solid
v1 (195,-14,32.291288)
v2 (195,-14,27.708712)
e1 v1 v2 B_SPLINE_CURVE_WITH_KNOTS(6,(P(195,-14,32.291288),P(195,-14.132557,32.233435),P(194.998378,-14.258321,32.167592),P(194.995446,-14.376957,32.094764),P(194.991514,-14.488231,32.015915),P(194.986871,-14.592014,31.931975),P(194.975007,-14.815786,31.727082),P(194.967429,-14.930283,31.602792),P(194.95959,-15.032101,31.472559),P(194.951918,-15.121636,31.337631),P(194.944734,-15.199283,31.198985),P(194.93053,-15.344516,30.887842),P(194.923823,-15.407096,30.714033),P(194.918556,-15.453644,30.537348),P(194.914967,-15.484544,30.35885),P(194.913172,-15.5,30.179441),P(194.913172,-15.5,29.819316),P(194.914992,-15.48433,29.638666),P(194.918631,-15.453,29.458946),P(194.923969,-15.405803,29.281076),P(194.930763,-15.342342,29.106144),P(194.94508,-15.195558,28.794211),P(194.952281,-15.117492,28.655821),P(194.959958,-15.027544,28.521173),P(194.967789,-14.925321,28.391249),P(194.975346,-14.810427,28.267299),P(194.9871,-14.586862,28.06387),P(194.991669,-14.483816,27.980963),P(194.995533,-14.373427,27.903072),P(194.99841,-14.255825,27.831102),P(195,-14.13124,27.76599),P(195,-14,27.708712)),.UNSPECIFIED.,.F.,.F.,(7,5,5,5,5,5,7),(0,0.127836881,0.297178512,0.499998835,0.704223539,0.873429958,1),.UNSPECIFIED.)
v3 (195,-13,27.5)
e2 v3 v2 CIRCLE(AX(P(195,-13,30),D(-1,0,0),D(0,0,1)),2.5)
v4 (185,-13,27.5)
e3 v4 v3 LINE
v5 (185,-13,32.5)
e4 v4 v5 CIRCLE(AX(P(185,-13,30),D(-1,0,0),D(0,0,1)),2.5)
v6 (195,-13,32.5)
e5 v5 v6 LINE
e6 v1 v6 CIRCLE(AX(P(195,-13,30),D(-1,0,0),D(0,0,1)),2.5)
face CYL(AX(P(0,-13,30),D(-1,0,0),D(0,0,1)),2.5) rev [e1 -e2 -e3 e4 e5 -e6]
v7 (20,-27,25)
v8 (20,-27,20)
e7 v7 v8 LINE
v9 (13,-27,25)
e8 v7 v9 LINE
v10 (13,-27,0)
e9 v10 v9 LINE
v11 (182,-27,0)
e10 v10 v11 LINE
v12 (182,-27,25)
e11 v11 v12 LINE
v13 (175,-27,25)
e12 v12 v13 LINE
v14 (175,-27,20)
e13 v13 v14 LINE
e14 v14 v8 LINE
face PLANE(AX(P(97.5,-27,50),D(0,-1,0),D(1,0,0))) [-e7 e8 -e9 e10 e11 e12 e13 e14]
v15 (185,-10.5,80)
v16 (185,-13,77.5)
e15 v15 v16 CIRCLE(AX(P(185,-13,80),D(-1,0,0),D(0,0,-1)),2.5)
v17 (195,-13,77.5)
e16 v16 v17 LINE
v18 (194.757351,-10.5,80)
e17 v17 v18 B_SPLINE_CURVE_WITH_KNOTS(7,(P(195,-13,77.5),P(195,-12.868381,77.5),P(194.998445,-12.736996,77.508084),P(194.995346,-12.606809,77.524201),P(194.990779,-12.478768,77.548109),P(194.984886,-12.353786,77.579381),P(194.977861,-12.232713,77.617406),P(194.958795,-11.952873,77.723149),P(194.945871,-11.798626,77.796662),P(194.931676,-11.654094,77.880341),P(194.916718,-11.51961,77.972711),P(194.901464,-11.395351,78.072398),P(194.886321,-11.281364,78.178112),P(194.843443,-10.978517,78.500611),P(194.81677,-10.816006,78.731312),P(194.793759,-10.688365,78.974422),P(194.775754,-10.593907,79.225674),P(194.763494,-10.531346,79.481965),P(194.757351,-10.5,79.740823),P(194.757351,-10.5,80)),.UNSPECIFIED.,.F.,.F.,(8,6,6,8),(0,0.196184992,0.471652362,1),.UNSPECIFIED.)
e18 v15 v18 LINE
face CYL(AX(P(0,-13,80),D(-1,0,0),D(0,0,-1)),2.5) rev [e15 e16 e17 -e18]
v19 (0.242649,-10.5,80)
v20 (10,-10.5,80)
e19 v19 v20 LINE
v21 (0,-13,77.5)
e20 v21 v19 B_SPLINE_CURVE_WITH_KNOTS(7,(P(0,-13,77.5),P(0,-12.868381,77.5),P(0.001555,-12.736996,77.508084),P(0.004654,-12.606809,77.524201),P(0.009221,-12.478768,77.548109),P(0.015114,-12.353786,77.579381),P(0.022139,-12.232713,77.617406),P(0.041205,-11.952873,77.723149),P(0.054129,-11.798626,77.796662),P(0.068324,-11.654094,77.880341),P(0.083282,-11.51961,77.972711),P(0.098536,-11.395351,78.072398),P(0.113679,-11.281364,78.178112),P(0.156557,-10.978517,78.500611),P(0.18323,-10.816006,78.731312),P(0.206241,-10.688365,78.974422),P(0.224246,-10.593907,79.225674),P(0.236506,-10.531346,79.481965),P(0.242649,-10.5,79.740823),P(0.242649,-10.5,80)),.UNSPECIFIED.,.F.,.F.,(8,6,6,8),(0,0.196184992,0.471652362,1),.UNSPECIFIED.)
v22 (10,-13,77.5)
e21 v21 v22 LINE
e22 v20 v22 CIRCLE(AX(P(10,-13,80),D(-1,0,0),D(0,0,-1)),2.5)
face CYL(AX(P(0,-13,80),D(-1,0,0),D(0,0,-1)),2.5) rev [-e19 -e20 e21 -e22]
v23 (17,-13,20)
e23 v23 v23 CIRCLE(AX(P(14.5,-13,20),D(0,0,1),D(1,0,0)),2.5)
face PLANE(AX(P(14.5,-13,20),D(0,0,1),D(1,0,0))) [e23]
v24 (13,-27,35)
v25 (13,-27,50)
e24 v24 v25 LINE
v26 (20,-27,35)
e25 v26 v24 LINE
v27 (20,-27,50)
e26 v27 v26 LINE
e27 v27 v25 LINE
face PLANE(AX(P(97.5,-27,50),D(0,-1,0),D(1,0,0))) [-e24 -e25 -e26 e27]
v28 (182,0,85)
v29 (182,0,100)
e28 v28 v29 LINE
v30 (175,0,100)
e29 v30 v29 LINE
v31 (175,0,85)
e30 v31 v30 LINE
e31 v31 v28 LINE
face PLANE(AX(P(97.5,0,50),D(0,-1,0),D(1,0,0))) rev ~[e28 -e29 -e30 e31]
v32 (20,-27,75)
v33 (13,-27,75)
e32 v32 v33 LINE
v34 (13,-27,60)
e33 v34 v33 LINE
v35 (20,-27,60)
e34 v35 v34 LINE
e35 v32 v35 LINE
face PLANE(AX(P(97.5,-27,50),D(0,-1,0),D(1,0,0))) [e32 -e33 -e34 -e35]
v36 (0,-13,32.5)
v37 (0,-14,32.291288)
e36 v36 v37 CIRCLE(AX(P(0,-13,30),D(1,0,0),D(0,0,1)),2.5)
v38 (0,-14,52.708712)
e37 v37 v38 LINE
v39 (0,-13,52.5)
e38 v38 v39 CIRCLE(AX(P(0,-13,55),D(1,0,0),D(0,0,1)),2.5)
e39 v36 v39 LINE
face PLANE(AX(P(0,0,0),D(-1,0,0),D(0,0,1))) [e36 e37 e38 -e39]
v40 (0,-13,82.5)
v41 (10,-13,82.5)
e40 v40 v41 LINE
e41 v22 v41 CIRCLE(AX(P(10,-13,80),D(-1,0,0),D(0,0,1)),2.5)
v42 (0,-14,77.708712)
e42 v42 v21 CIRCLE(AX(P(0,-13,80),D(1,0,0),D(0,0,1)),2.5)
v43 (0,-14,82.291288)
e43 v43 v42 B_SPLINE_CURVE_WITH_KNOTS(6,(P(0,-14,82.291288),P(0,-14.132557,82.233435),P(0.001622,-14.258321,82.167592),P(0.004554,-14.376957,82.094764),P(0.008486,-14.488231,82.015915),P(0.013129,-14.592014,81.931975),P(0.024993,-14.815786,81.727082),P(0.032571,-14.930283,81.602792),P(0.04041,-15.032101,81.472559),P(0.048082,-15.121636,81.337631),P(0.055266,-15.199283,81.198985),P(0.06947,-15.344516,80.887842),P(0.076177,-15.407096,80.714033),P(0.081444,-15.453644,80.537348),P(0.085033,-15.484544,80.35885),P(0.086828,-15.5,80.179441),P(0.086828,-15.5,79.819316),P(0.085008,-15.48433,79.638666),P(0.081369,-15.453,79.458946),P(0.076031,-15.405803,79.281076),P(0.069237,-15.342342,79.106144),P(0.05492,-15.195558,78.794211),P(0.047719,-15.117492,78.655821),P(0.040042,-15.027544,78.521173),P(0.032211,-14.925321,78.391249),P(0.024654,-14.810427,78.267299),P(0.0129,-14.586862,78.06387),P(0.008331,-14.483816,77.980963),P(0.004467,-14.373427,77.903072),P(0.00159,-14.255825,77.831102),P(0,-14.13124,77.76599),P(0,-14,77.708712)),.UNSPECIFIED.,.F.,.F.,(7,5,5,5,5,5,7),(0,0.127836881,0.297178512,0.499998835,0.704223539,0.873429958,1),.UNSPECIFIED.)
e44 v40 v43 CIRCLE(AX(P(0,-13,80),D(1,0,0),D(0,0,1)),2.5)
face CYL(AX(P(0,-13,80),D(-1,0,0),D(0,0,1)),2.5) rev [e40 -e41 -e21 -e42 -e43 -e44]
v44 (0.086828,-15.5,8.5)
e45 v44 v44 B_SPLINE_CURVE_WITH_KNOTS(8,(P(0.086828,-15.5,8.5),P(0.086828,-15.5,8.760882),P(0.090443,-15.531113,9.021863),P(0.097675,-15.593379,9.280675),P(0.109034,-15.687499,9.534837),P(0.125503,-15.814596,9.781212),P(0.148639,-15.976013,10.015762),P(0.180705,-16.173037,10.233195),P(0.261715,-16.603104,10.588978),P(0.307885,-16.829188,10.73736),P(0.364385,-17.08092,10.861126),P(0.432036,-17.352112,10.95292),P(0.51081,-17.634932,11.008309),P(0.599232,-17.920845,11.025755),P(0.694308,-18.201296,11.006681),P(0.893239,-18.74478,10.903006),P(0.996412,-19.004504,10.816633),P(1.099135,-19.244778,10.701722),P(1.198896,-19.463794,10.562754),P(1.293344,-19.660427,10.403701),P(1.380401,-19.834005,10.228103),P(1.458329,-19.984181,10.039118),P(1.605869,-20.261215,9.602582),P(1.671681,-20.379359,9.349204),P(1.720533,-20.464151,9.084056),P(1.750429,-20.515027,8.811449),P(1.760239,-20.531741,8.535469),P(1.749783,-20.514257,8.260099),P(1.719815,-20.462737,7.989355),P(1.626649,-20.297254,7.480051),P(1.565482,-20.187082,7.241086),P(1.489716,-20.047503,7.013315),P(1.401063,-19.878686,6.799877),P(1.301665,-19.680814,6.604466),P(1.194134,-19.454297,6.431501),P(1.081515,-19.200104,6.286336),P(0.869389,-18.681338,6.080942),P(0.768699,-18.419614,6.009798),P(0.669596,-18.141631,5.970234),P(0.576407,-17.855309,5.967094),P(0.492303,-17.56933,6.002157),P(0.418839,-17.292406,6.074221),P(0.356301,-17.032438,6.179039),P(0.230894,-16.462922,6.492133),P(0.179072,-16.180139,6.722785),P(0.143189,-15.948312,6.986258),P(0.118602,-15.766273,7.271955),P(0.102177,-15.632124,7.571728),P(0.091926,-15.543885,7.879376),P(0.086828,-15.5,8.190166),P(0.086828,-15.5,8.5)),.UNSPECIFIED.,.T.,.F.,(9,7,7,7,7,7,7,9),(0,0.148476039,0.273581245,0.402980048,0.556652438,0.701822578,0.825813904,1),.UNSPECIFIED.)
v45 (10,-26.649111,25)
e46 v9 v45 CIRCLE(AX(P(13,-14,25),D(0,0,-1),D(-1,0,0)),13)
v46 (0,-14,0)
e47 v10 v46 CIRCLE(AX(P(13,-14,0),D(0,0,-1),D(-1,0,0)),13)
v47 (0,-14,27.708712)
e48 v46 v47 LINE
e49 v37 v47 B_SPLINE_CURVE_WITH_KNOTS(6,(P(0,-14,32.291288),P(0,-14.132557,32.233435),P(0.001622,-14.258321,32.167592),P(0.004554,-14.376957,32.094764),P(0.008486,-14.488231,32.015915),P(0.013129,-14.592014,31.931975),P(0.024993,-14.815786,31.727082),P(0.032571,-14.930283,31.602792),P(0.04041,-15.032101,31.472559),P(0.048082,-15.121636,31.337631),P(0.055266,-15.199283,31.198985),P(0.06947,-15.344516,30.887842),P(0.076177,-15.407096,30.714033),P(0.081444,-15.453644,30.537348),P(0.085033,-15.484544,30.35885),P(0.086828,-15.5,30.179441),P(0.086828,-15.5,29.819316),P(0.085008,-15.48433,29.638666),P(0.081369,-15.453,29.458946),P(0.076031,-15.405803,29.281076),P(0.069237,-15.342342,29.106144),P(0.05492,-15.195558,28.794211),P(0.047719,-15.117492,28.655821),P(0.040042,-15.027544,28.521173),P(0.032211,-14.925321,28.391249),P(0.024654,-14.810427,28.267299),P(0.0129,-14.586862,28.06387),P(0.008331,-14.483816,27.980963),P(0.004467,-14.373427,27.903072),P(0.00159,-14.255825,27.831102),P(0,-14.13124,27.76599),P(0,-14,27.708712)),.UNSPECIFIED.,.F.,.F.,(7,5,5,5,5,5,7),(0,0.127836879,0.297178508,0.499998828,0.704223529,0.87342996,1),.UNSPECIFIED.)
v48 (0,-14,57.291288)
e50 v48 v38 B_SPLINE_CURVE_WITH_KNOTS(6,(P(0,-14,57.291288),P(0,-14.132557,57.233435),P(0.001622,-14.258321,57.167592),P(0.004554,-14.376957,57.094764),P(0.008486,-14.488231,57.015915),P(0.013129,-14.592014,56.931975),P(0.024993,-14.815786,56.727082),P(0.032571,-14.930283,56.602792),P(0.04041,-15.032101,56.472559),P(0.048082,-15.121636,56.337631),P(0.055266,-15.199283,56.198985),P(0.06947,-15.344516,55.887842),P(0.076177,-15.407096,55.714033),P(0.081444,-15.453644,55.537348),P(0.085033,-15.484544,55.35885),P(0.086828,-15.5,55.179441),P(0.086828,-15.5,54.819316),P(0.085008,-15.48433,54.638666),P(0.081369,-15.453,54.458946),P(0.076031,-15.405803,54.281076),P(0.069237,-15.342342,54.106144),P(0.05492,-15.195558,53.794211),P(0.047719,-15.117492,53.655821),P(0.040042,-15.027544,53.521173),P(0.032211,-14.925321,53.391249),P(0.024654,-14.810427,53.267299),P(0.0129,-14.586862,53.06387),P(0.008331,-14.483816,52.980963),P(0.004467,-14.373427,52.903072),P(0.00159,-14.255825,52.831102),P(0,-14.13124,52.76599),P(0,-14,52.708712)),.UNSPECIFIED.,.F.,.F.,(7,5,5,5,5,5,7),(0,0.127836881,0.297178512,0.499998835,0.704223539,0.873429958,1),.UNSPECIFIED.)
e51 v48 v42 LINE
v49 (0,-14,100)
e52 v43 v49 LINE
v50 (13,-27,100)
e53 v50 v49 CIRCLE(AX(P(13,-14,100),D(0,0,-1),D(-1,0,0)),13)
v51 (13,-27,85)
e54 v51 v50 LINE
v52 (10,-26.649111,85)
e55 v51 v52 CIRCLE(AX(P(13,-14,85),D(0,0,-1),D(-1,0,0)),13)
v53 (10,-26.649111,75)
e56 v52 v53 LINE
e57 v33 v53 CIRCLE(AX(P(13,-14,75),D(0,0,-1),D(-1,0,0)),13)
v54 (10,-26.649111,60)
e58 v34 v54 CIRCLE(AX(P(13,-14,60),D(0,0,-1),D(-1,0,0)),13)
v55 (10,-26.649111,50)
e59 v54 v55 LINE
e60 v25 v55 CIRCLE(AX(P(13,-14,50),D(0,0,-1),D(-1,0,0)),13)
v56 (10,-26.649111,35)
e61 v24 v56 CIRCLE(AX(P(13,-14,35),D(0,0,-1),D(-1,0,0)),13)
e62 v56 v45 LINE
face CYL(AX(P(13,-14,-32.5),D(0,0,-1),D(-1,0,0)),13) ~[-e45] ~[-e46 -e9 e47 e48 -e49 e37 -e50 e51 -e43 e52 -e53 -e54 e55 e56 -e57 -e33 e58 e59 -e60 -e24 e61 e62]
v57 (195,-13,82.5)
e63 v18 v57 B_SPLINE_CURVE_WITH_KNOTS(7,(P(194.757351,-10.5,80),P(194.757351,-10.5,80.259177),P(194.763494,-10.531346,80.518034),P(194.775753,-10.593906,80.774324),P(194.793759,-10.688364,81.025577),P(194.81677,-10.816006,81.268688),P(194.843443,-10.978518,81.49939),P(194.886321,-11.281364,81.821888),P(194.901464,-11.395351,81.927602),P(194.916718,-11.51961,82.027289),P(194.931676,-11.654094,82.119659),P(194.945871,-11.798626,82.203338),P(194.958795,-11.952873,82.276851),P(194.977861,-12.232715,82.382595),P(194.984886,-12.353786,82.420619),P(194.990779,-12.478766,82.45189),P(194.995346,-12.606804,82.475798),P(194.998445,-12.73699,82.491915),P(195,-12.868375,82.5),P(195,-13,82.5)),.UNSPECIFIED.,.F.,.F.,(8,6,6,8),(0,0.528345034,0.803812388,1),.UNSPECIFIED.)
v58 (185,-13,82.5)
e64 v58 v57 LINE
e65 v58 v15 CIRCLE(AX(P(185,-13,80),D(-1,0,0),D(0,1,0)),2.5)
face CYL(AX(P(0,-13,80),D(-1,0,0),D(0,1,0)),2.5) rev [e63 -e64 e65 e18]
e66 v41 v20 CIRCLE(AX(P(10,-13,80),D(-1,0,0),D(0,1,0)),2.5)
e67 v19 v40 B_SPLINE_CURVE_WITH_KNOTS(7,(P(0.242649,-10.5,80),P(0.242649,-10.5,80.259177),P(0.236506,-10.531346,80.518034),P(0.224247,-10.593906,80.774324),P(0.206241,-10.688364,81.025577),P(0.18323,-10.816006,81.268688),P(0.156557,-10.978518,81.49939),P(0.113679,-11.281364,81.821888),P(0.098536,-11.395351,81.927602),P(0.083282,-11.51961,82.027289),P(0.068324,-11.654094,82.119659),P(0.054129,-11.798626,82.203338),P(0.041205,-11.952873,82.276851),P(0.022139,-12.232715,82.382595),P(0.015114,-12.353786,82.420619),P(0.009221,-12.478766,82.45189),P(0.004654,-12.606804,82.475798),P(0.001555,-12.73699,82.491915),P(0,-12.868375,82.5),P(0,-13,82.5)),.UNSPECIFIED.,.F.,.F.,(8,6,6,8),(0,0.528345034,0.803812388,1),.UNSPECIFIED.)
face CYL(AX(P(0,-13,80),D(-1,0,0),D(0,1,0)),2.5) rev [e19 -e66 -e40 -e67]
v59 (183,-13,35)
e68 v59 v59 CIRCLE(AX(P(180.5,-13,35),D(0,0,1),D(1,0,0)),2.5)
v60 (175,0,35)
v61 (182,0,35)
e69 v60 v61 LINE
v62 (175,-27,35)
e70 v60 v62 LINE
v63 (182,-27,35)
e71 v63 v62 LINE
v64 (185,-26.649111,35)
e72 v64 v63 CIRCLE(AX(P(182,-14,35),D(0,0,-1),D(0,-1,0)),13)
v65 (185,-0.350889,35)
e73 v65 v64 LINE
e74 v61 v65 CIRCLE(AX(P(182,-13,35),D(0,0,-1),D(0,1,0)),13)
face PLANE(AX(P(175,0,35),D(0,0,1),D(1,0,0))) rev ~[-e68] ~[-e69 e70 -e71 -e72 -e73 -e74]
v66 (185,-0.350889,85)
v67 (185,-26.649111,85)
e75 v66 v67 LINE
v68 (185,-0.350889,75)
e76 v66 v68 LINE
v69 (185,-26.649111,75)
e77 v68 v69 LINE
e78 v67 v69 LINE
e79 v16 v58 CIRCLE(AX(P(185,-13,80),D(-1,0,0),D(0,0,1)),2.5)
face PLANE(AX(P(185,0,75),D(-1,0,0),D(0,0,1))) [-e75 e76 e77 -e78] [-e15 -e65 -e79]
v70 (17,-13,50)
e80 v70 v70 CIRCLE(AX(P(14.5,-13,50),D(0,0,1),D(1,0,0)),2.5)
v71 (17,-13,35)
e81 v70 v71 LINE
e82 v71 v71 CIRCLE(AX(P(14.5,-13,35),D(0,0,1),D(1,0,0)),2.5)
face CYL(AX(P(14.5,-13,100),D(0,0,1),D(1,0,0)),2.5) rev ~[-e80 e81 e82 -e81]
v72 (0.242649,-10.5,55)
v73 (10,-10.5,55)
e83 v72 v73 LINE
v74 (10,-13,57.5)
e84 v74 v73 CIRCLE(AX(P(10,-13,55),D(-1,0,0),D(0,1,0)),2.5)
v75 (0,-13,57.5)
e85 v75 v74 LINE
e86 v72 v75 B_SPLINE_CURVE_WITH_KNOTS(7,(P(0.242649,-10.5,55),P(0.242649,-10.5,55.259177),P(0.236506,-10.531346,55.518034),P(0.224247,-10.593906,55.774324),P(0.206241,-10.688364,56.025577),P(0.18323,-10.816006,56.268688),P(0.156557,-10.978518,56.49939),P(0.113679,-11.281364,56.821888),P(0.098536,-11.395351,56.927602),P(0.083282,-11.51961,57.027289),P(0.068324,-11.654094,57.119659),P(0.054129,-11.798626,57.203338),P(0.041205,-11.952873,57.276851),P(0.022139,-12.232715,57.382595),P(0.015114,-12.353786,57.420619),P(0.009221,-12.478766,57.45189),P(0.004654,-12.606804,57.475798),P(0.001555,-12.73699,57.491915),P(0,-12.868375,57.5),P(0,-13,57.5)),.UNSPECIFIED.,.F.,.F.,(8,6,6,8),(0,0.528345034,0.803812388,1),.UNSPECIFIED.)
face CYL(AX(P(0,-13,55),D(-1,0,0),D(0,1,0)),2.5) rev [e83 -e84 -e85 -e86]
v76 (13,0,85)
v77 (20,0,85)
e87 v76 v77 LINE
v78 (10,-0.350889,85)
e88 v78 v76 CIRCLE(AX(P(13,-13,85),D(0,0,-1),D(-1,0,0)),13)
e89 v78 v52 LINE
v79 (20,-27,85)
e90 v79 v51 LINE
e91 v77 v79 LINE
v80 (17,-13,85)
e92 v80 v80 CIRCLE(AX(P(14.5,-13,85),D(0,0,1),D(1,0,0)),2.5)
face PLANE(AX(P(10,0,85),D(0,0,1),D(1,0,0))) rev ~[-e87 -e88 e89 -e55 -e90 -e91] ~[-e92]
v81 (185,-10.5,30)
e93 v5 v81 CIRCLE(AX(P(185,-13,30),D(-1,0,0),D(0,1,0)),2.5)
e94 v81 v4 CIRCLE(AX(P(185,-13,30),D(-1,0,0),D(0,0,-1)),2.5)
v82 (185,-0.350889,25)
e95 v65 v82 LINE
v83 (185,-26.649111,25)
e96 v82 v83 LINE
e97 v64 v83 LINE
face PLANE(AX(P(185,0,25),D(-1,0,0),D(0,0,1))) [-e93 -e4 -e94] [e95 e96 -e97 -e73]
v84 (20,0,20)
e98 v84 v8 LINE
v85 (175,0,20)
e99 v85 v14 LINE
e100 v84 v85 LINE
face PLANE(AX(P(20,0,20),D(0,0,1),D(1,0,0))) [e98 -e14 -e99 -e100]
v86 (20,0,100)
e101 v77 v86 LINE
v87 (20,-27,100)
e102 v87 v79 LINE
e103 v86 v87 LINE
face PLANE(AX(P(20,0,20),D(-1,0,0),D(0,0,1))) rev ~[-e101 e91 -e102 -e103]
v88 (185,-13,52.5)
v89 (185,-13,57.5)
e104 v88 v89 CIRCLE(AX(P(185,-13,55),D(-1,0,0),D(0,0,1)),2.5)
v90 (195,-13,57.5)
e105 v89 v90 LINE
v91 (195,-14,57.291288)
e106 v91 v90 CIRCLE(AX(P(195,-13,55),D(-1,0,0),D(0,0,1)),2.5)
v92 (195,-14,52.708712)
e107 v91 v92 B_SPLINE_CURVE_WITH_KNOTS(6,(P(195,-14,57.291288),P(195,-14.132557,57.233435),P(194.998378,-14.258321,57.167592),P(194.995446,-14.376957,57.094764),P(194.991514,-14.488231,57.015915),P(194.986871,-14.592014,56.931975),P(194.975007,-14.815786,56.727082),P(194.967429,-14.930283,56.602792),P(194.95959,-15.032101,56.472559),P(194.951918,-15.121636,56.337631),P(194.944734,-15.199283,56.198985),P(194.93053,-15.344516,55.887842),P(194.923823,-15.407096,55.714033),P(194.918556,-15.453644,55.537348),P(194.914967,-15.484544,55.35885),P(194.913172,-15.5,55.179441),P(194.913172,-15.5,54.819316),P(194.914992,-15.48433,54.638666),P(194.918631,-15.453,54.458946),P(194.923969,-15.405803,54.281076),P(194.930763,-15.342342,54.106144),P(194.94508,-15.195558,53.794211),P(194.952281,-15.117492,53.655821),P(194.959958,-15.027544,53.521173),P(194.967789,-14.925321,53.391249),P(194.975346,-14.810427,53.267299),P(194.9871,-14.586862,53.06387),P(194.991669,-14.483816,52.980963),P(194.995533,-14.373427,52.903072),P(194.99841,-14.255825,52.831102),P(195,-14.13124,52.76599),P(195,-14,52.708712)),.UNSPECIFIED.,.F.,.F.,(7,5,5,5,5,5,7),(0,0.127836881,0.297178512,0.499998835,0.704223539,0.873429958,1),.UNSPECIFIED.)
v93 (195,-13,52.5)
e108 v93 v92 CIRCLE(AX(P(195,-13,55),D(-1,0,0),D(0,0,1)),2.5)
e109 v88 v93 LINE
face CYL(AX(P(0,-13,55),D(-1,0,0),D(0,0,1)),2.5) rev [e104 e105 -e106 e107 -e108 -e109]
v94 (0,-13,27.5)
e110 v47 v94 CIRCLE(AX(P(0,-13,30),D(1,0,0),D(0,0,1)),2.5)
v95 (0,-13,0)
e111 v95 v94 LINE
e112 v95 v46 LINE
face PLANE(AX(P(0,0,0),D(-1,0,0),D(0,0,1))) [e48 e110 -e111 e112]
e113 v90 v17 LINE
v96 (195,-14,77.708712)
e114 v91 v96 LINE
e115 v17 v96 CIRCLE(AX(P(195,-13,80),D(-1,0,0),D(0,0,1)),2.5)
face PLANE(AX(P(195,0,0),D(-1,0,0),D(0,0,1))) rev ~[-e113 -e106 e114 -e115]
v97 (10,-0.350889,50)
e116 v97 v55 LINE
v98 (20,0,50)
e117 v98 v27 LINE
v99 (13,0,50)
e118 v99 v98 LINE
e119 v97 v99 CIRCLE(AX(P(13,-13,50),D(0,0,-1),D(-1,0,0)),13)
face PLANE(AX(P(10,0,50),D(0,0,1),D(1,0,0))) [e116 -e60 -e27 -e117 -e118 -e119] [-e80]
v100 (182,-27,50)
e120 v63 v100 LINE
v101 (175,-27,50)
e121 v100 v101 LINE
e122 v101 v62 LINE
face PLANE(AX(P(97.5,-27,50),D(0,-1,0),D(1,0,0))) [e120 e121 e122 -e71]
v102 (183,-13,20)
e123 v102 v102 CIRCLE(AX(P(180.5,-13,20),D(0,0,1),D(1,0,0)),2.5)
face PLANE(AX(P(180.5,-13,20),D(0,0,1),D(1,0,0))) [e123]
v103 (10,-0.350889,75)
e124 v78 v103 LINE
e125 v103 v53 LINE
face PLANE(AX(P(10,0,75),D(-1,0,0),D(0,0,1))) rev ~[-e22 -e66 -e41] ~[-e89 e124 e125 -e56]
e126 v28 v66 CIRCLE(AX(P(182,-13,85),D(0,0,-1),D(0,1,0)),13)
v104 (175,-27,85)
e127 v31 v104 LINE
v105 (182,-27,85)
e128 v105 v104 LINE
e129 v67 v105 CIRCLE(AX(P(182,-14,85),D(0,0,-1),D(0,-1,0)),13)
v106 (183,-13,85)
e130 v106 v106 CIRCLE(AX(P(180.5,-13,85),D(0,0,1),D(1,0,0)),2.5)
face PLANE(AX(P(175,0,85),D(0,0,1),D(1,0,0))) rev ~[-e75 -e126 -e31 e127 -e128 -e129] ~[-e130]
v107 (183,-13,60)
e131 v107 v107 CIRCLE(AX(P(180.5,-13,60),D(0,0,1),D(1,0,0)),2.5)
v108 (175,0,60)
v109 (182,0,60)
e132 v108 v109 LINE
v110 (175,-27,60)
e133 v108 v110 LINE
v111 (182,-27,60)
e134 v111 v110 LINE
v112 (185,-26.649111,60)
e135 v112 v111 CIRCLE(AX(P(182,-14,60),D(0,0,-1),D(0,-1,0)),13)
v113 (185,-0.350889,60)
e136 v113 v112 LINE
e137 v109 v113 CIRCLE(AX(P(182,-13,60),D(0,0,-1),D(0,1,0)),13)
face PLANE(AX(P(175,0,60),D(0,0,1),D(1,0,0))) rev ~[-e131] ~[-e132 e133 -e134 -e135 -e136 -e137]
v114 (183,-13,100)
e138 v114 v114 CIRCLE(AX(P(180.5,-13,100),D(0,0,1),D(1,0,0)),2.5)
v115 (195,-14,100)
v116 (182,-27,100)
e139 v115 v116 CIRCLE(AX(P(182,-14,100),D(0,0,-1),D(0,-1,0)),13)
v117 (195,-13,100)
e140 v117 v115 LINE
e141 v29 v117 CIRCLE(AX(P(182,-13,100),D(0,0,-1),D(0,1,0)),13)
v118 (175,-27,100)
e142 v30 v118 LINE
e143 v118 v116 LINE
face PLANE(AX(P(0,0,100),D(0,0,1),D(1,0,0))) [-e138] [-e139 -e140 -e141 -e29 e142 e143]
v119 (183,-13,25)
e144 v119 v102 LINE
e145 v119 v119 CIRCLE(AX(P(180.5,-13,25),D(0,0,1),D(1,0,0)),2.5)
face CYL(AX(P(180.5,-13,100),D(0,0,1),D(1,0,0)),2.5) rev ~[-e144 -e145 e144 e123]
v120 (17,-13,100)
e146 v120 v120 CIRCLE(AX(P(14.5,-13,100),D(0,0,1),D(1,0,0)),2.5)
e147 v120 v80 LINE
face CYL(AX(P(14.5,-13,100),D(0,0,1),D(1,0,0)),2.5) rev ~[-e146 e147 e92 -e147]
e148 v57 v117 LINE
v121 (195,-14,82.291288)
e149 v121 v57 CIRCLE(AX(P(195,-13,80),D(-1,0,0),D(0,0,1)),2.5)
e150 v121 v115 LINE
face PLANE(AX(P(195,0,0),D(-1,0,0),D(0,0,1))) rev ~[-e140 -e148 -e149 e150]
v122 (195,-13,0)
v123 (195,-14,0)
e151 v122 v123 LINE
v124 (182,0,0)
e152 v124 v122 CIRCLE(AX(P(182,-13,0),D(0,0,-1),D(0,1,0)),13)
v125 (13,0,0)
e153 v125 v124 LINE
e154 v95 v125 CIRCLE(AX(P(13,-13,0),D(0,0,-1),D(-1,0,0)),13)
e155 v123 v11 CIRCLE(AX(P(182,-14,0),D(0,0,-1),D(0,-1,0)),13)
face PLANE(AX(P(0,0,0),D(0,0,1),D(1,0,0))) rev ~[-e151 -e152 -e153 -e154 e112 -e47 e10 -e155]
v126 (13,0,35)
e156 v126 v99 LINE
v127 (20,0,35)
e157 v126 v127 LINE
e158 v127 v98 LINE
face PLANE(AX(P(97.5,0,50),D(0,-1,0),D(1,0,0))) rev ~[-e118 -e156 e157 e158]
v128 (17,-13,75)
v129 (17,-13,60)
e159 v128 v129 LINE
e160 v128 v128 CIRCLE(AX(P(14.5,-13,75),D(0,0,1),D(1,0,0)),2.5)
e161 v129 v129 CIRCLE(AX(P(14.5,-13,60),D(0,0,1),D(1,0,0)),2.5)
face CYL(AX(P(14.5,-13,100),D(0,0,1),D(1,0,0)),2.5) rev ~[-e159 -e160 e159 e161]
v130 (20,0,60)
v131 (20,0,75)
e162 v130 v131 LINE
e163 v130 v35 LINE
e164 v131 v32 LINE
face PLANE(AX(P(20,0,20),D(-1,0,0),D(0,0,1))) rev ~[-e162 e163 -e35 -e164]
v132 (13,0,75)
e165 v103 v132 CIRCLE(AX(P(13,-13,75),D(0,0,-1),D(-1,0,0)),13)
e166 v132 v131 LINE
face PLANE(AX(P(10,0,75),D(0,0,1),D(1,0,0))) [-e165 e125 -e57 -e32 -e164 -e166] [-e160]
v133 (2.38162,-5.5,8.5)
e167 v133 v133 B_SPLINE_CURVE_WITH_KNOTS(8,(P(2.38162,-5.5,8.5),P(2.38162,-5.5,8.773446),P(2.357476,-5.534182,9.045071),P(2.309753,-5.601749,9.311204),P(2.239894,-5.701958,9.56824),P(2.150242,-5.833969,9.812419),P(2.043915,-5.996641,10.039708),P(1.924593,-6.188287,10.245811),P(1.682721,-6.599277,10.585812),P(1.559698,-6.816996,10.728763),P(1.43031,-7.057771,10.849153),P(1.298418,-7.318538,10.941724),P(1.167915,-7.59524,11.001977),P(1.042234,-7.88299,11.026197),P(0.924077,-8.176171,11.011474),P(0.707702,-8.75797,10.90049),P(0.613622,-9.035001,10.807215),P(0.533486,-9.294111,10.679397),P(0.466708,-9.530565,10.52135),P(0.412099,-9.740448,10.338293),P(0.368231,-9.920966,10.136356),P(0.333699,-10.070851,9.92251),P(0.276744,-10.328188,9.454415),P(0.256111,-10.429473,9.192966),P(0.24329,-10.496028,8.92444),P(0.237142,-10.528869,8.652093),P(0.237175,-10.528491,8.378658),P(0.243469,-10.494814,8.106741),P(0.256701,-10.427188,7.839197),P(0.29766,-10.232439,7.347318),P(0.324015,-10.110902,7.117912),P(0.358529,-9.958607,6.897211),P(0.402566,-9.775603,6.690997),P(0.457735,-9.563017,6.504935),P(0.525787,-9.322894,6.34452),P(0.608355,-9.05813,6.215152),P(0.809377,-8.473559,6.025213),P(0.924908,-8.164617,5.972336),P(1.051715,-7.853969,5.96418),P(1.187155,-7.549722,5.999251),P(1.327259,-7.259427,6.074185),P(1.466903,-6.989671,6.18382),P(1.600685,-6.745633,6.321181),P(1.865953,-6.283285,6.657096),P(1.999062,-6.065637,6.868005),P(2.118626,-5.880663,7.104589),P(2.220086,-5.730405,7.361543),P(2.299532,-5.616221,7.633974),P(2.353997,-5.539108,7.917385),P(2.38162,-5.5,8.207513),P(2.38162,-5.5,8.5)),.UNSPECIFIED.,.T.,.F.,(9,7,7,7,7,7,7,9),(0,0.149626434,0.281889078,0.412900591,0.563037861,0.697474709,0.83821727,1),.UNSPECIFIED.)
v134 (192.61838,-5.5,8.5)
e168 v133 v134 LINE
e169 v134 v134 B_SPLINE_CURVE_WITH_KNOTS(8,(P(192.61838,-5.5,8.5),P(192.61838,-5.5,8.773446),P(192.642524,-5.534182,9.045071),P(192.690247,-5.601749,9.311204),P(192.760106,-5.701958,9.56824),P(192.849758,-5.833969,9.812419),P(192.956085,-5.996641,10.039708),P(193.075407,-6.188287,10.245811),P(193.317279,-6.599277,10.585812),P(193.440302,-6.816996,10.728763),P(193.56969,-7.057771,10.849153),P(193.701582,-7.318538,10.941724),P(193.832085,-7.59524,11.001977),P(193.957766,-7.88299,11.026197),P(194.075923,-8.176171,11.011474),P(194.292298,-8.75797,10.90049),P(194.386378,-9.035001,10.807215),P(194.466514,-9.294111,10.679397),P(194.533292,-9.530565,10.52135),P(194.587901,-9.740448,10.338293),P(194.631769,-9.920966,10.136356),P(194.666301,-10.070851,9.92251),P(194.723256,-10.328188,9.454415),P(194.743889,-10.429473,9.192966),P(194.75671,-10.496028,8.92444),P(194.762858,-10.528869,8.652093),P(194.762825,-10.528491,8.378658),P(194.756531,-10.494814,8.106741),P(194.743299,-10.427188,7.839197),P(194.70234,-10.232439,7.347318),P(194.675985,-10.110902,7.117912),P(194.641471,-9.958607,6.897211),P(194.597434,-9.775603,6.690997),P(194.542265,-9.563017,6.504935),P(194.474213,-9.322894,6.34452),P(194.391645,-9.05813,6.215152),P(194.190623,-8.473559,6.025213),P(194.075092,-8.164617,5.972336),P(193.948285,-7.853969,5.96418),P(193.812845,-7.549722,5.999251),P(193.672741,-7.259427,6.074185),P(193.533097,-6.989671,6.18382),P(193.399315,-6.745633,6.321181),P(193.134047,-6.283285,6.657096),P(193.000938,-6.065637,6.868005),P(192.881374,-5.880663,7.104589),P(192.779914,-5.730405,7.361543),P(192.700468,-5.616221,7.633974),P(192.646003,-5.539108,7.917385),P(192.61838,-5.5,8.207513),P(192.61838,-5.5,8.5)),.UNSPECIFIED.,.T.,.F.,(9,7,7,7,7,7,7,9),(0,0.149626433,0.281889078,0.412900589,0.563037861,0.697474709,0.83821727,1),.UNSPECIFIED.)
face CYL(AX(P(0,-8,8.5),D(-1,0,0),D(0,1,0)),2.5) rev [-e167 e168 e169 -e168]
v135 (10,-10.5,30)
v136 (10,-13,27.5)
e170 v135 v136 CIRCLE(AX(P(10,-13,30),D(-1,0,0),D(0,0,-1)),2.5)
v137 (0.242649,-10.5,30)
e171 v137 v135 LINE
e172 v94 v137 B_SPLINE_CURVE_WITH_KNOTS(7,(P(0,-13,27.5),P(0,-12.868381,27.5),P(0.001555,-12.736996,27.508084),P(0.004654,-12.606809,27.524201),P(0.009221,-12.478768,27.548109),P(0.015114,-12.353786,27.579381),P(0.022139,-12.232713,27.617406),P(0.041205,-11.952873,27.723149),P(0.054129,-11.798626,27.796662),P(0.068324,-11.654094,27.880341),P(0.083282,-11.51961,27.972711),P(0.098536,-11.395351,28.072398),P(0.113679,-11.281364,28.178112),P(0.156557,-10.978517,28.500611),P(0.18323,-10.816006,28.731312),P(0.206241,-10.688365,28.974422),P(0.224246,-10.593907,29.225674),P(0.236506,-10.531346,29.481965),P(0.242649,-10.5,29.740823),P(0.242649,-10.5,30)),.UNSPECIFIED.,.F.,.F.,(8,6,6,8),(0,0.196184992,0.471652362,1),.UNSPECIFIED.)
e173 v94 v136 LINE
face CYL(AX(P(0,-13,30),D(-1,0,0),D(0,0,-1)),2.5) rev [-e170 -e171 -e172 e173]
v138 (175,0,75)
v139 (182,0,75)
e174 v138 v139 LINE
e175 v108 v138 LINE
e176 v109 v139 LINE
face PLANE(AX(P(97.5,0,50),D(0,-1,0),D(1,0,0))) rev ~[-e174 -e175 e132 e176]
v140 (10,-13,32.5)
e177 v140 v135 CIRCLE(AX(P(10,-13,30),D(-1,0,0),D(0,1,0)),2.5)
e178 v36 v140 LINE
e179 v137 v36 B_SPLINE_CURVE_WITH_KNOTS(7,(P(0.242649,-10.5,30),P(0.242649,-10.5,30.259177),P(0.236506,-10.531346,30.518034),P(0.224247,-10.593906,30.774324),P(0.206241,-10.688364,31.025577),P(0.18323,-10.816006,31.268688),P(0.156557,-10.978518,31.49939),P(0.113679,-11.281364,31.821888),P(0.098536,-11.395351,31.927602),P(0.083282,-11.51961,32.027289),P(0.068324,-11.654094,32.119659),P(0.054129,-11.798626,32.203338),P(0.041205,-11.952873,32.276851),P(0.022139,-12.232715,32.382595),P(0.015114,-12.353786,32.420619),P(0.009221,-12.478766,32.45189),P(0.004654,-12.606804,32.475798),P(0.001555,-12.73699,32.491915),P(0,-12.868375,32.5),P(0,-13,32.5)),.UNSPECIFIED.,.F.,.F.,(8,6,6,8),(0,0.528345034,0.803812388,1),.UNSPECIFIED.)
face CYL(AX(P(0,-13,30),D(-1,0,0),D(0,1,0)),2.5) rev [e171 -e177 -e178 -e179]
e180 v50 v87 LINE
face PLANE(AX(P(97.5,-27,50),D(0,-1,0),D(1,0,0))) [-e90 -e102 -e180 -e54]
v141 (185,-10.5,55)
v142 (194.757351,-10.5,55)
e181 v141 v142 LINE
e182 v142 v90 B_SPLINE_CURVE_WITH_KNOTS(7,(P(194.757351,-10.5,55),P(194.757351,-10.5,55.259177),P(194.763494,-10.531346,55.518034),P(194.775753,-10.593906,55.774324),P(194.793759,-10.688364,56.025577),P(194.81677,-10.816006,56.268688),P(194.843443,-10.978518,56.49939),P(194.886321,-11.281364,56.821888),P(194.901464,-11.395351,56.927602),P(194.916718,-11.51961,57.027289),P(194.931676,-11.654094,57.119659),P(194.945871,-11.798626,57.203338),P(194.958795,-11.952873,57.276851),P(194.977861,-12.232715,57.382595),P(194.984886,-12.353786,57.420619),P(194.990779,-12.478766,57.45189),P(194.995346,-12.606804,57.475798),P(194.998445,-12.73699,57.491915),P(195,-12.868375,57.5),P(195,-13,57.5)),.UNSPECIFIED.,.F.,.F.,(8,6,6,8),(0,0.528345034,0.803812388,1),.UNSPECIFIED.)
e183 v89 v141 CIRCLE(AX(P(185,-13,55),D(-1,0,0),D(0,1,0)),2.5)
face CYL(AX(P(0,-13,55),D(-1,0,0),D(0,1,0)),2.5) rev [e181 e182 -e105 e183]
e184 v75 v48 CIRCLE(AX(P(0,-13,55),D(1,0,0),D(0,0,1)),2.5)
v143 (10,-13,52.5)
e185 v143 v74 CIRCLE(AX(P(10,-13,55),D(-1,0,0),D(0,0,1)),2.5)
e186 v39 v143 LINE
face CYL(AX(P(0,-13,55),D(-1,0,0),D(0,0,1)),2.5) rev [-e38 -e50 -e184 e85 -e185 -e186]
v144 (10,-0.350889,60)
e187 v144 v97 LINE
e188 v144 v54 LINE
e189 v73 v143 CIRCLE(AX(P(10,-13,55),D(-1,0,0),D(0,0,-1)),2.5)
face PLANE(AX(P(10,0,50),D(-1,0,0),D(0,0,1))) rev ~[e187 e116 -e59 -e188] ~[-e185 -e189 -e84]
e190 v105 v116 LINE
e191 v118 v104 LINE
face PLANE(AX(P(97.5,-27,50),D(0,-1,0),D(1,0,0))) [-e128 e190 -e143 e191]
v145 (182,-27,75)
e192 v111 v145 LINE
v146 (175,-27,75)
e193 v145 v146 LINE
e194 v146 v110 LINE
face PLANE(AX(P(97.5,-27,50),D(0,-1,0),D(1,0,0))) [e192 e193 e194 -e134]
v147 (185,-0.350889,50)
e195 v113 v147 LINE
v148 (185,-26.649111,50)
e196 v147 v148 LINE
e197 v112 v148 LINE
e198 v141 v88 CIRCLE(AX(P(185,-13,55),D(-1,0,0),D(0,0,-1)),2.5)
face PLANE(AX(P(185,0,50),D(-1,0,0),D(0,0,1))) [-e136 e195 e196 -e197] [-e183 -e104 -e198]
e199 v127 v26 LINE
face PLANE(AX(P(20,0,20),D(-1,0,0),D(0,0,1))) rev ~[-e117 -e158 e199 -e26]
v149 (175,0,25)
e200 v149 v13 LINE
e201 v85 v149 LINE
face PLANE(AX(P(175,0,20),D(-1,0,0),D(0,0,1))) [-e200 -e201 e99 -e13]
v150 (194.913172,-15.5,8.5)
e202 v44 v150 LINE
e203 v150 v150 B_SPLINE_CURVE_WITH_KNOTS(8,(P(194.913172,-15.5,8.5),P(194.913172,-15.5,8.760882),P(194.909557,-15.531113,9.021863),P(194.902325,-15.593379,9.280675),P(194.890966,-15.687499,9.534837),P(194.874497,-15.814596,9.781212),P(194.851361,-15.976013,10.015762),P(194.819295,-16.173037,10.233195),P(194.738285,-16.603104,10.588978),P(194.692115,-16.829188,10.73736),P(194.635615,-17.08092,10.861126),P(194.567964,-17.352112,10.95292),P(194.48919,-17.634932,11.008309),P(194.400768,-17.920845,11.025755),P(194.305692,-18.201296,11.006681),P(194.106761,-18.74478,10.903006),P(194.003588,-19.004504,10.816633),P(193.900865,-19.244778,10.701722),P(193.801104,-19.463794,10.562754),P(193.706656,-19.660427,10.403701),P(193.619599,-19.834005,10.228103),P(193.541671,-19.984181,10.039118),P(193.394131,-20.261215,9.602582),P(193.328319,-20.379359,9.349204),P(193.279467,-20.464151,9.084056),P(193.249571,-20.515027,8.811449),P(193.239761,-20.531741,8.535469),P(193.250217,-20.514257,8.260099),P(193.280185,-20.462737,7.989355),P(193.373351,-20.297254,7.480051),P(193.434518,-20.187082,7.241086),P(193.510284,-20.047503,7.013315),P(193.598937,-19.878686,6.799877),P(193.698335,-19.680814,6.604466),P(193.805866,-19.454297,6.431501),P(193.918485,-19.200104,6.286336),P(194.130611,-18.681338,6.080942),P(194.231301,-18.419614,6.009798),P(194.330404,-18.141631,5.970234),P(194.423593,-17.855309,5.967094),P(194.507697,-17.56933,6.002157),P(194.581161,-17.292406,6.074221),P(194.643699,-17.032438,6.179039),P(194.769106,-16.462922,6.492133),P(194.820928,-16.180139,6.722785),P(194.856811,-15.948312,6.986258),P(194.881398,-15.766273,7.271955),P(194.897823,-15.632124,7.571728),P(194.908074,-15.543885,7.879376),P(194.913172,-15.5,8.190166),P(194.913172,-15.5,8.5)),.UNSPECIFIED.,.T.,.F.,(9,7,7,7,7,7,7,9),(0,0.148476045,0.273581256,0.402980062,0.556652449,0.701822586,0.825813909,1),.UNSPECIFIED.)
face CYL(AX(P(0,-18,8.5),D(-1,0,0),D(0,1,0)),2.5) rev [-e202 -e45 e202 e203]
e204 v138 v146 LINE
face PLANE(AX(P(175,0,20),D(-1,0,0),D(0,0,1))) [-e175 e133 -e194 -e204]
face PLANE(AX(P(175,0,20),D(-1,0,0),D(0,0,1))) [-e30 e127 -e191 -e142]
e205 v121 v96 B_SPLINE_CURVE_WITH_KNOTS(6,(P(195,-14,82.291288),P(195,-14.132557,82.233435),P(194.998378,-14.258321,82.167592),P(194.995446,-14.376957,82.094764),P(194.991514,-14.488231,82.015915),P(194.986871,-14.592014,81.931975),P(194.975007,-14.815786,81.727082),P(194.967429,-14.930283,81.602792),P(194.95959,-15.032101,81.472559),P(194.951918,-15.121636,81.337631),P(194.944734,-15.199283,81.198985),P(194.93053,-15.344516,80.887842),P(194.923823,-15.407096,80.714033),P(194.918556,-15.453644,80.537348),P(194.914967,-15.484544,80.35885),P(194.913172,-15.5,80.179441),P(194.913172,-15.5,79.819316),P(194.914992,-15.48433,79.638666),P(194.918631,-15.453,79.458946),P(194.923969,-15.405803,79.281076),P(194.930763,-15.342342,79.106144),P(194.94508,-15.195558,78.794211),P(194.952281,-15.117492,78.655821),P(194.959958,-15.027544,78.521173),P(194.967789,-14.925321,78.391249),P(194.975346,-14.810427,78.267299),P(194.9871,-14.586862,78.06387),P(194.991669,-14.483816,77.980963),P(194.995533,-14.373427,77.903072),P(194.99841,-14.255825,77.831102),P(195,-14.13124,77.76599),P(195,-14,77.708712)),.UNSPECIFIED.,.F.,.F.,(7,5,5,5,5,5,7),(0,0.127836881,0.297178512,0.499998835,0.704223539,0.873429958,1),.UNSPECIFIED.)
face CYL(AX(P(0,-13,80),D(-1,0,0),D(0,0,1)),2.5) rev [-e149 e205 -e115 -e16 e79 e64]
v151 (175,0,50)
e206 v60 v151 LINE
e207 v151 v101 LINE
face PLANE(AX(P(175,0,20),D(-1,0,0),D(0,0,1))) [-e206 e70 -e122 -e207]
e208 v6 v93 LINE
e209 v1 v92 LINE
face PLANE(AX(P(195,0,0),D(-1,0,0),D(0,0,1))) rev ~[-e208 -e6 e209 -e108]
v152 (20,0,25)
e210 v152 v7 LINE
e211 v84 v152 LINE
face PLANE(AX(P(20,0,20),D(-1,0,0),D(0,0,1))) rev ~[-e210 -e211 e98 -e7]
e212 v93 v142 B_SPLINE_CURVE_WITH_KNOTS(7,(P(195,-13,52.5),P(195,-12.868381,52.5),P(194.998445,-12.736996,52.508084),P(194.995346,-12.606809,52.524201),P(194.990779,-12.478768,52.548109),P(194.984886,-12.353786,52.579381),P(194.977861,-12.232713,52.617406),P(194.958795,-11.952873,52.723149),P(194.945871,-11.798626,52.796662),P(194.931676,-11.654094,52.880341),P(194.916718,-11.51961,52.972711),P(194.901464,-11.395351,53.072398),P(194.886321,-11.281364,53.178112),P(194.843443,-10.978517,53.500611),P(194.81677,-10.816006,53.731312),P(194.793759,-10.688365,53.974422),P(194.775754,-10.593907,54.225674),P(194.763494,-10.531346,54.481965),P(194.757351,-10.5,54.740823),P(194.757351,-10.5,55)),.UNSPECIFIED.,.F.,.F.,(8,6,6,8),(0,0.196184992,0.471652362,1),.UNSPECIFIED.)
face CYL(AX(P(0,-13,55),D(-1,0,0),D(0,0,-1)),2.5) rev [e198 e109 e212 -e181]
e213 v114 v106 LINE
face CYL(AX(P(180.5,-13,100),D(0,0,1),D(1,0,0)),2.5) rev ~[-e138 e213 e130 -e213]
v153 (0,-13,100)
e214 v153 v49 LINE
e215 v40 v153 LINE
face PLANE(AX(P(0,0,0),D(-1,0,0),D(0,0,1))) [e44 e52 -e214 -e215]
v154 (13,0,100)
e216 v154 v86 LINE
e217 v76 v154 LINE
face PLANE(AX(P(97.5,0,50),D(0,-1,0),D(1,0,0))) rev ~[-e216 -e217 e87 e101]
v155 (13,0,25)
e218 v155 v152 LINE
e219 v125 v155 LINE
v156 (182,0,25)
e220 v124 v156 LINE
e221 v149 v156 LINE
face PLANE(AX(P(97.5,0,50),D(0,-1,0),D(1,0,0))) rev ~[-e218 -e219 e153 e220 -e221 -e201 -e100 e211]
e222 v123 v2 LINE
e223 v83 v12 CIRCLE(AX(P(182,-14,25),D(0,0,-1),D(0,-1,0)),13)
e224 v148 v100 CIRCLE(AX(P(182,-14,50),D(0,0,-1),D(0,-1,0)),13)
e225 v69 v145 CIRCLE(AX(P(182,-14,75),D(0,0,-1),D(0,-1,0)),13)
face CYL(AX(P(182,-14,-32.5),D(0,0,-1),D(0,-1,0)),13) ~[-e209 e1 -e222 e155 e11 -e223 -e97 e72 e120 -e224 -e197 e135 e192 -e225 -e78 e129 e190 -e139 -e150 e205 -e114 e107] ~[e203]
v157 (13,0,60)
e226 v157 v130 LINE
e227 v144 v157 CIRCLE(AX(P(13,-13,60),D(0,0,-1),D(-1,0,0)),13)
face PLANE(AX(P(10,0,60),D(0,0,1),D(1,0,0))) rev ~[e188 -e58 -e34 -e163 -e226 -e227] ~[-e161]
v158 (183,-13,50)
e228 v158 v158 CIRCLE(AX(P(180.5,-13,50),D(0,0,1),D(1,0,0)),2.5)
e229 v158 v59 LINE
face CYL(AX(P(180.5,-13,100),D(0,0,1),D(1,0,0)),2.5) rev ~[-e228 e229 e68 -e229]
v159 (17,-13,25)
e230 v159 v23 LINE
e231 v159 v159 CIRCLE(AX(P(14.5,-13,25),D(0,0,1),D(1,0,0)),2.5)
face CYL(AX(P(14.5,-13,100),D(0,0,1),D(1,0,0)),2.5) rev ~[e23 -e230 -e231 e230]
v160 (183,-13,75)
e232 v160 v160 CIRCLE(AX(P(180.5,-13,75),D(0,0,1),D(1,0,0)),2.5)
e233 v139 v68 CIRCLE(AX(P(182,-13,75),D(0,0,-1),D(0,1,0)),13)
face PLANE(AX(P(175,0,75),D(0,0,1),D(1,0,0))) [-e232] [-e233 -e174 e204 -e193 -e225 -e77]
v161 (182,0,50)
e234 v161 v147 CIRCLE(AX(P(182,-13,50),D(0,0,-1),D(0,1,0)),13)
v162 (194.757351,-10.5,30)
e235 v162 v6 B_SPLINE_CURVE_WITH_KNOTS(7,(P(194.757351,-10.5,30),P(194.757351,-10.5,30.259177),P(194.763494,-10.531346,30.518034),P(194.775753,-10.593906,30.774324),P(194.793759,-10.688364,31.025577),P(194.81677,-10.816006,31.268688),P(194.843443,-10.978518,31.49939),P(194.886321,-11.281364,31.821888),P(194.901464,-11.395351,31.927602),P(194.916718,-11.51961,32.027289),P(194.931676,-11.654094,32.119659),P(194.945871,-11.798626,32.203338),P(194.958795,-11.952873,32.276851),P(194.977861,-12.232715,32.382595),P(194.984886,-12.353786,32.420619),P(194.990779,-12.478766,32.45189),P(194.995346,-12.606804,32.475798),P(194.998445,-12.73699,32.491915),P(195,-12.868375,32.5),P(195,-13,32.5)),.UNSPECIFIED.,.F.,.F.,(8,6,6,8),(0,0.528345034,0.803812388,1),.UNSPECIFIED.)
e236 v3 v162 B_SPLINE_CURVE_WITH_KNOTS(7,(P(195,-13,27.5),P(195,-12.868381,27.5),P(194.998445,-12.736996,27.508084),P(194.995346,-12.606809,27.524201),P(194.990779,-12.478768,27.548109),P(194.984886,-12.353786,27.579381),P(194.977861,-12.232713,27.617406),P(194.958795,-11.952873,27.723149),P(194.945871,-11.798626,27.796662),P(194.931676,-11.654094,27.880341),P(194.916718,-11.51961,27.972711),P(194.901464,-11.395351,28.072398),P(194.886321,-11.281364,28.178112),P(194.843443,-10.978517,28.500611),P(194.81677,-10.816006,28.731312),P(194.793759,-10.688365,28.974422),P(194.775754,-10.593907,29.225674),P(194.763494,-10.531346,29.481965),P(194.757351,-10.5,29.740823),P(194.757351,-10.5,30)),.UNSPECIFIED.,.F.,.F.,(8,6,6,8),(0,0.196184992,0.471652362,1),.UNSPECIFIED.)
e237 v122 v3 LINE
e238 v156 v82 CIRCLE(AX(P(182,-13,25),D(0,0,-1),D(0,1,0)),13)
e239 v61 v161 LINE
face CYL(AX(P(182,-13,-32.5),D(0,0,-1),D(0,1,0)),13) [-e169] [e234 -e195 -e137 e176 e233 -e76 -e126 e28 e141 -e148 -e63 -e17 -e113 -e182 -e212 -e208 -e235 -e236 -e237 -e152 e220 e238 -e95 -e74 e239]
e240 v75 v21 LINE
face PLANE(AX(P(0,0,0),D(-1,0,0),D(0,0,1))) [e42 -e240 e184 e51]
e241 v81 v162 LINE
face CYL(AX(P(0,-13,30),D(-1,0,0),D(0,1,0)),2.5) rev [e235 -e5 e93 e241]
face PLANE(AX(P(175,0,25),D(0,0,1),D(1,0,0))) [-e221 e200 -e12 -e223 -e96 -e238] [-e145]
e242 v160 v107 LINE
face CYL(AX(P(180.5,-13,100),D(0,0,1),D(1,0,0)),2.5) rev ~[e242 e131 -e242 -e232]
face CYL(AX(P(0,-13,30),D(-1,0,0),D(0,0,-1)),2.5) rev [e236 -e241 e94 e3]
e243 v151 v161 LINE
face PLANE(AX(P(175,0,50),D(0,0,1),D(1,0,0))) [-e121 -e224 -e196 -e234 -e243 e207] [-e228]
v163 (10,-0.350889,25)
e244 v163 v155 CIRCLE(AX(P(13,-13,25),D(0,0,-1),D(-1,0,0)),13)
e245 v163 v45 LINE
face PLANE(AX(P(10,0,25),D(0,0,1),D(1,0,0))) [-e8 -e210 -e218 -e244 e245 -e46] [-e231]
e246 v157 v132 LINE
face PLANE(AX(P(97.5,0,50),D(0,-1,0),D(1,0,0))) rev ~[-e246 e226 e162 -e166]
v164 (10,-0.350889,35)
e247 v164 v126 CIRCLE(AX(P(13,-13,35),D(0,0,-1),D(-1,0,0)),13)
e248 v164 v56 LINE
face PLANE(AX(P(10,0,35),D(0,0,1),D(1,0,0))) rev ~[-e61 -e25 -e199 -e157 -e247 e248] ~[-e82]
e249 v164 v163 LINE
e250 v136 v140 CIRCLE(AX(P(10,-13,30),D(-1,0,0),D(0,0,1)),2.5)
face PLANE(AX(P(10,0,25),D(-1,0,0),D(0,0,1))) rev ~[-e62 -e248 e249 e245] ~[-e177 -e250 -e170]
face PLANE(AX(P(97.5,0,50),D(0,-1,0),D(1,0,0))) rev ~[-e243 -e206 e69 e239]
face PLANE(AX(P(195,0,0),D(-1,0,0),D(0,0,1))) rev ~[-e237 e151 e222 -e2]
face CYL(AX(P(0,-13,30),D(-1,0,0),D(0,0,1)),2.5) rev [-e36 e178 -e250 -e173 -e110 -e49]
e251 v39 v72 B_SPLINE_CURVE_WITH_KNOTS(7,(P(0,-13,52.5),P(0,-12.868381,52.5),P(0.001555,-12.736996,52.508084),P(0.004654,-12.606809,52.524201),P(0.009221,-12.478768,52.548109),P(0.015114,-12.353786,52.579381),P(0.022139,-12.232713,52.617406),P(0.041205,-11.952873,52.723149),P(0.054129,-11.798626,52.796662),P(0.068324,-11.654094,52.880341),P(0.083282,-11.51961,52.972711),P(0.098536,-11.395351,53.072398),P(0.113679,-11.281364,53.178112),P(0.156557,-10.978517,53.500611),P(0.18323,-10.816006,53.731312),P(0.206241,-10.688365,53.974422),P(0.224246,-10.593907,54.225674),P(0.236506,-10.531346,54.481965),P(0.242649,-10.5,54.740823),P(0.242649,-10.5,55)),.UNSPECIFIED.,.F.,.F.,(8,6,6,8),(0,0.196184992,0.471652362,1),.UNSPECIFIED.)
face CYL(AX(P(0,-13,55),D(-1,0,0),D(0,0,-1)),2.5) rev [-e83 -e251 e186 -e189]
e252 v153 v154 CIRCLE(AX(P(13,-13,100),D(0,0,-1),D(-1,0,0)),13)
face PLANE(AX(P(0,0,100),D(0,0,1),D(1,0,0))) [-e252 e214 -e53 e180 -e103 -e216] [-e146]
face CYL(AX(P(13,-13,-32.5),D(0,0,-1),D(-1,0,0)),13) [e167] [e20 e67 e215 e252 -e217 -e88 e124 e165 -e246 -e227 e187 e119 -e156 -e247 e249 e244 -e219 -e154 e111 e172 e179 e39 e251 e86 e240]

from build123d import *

# Parameters (mm, degrees)
F0_W         = 195
F0_H         = 100
F1_DEPTH     = 27
F2_W         = 155
F2_H         = 80
F3_DEPTH     = 27.001
F4_W         = 10
F4_H         = 10
F5_DEPTH     = 27.001
F6_R         = 2.5
F7_DEPTH     = 80
F9_DEPTH     = 195.001
F10_R        = 2.5
F11_DEPTH    = 195.001
F12_T1_DEPTH = 165


# Not quite as in the source:
# - a fillet or chamfer that OpenCascade refuses, or shapes differently, is made with other operations: its cross-section is extruded or revolved along the edge and cut away or added


with BuildPart() as f1:
    # F0 (on Front) → F1 (new body)
    with BuildSketch(Plane.XZ):
        with Locations((97.5, 50)):
            Rectangle(F0_W, F0_H)
    extrude(amount=F1_DEPTH)

    # F2 (on Front) → F3 (cut, through all)
    with BuildSketch(Plane.XZ):
        with Locations((97.5, 60)):
            Rectangle(F2_W, F2_H)
    extrude(amount=F3_DEPTH, mode=Mode.SUBTRACT)

    # F4 (on Front) → F5 (cut, through all)
    with BuildSketch(Plane.XZ):
        with Locations((180, 80)):
            Rectangle(F4_W, F4_H)
        with Locations((180, 55)):
            Rectangle(F4_W, F4_H)
        with Locations((180, 30)):
            Rectangle(F4_W, F4_H)
        with Locations((15, 30)):
            Rectangle(F4_W, F4_H)
        with Locations((15, 55)):
            Rectangle(F4_W, F4_H)
        with Locations((15, 80)):
            Rectangle(F4_W, F4_H)
    extrude(amount=F5_DEPTH, mode=Mode.SUBTRACT)

    # F6 (on face) → F7 (cut)
    with BuildSketch(Plane.XY.offset(100)):
        with Locations((180.5, -13)):
            Circle(F6_R)
        with Locations((14.5, -13)):
            Circle(F6_R)
    extrude(amount=-F7_DEPTH, mode=Mode.SUBTRACT)

    # F8 (on Right) → F9 (cut, through all)
    with BuildSketch(Plane.YZ):
        with BuildLine():
            Line((-13, 77.5), (-13, 82.5))
            ThreePointArc((-13, 82.5), (-15.5, 80), (-13, 77.5))
        make_face()
        with BuildLine():
            ThreePointArc((-13, 77.5), (-11.232233047, 78.232233047), (-10.5, 80))
            ThreePointArc((-10.5, 80), (-11.232233047, 81.767766953), (-13, 82.5))
            Line((-13, 82.5), (-13, 77.5))
        make_face()
        with BuildLine():
            Line((-13, 52.5), (-13, 57.5))
            ThreePointArc((-13, 57.5), (-15.5, 55), (-13, 52.5))
        make_face()
        with BuildLine():
            ThreePointArc((-10.5, 55), (-11.232233047, 56.767766953), (-13, 57.5))
            Line((-13, 57.5), (-13, 52.5))
            ThreePointArc((-13, 52.5), (-11.232233047, 53.232233047), (-10.5, 55))
        make_face()
        with BuildLine():
            Line((-13, 27.5), (-13, 32.5))
            ThreePointArc((-13, 32.5), (-15.5, 30), (-13, 27.5))
        make_face()
        with BuildLine():
            ThreePointArc((-10.5, 30), (-11.232233047, 31.767766953), (-13, 32.5))
            Line((-13, 32.5), (-13, 27.5))
            ThreePointArc((-13, 27.5), (-11.232233047, 28.232233047), (-10.5, 30))
        make_face()
    extrude(amount=F9_DEPTH, mode=Mode.SUBTRACT)

    # F10 (on Right) → F11 (cut, through all)
    with BuildSketch(Plane.YZ):
        with Locations((-8, 8.5)):
            Circle(F10_R)
        with Locations((-18, 8.5)):
            Circle(F10_R)
    extrude(amount=F11_DEPTH, mode=Mode.SUBTRACT)

    # F12: fillet of radius 13 on 4 edges, made by hand

    # F12_s2 → F12_t1 (cut)
    with BuildSketch(Plane.XY.offset(-32.5)):
        with BuildLine():
            ThreePointArc((0, -13), (3.8076118446, -3.8076118446), (13, 0))
            Line((13, 0), (0, 0))
            Line((0, 0), (0, -13))
        make_face()
        with BuildLine():
            ThreePointArc((0, -14), (3.8076118446, -23.1923881554), (13, -27))
            Line((13, -27), (0, -27))
            Line((0, -27), (0, -14))
        make_face()
        with BuildLine():
            ThreePointArc((182, -27), (191.1923881554, -23.1923881554), (195, -14))
            Line((195, -14), (195, -27))
            Line((195, -27), (182, -27))
        make_face()
        with BuildLine():
            ThreePointArc((182, 0), (191.1923881554, -3.8076118446), (195, -13))
            Line((195, -13), (195, 0))
            Line((195, 0), (182, 0))
        make_face()
    extrude(amount=F12_T1_DEPTH, mode=Mode.SUBTRACT)


solid = f1.part
